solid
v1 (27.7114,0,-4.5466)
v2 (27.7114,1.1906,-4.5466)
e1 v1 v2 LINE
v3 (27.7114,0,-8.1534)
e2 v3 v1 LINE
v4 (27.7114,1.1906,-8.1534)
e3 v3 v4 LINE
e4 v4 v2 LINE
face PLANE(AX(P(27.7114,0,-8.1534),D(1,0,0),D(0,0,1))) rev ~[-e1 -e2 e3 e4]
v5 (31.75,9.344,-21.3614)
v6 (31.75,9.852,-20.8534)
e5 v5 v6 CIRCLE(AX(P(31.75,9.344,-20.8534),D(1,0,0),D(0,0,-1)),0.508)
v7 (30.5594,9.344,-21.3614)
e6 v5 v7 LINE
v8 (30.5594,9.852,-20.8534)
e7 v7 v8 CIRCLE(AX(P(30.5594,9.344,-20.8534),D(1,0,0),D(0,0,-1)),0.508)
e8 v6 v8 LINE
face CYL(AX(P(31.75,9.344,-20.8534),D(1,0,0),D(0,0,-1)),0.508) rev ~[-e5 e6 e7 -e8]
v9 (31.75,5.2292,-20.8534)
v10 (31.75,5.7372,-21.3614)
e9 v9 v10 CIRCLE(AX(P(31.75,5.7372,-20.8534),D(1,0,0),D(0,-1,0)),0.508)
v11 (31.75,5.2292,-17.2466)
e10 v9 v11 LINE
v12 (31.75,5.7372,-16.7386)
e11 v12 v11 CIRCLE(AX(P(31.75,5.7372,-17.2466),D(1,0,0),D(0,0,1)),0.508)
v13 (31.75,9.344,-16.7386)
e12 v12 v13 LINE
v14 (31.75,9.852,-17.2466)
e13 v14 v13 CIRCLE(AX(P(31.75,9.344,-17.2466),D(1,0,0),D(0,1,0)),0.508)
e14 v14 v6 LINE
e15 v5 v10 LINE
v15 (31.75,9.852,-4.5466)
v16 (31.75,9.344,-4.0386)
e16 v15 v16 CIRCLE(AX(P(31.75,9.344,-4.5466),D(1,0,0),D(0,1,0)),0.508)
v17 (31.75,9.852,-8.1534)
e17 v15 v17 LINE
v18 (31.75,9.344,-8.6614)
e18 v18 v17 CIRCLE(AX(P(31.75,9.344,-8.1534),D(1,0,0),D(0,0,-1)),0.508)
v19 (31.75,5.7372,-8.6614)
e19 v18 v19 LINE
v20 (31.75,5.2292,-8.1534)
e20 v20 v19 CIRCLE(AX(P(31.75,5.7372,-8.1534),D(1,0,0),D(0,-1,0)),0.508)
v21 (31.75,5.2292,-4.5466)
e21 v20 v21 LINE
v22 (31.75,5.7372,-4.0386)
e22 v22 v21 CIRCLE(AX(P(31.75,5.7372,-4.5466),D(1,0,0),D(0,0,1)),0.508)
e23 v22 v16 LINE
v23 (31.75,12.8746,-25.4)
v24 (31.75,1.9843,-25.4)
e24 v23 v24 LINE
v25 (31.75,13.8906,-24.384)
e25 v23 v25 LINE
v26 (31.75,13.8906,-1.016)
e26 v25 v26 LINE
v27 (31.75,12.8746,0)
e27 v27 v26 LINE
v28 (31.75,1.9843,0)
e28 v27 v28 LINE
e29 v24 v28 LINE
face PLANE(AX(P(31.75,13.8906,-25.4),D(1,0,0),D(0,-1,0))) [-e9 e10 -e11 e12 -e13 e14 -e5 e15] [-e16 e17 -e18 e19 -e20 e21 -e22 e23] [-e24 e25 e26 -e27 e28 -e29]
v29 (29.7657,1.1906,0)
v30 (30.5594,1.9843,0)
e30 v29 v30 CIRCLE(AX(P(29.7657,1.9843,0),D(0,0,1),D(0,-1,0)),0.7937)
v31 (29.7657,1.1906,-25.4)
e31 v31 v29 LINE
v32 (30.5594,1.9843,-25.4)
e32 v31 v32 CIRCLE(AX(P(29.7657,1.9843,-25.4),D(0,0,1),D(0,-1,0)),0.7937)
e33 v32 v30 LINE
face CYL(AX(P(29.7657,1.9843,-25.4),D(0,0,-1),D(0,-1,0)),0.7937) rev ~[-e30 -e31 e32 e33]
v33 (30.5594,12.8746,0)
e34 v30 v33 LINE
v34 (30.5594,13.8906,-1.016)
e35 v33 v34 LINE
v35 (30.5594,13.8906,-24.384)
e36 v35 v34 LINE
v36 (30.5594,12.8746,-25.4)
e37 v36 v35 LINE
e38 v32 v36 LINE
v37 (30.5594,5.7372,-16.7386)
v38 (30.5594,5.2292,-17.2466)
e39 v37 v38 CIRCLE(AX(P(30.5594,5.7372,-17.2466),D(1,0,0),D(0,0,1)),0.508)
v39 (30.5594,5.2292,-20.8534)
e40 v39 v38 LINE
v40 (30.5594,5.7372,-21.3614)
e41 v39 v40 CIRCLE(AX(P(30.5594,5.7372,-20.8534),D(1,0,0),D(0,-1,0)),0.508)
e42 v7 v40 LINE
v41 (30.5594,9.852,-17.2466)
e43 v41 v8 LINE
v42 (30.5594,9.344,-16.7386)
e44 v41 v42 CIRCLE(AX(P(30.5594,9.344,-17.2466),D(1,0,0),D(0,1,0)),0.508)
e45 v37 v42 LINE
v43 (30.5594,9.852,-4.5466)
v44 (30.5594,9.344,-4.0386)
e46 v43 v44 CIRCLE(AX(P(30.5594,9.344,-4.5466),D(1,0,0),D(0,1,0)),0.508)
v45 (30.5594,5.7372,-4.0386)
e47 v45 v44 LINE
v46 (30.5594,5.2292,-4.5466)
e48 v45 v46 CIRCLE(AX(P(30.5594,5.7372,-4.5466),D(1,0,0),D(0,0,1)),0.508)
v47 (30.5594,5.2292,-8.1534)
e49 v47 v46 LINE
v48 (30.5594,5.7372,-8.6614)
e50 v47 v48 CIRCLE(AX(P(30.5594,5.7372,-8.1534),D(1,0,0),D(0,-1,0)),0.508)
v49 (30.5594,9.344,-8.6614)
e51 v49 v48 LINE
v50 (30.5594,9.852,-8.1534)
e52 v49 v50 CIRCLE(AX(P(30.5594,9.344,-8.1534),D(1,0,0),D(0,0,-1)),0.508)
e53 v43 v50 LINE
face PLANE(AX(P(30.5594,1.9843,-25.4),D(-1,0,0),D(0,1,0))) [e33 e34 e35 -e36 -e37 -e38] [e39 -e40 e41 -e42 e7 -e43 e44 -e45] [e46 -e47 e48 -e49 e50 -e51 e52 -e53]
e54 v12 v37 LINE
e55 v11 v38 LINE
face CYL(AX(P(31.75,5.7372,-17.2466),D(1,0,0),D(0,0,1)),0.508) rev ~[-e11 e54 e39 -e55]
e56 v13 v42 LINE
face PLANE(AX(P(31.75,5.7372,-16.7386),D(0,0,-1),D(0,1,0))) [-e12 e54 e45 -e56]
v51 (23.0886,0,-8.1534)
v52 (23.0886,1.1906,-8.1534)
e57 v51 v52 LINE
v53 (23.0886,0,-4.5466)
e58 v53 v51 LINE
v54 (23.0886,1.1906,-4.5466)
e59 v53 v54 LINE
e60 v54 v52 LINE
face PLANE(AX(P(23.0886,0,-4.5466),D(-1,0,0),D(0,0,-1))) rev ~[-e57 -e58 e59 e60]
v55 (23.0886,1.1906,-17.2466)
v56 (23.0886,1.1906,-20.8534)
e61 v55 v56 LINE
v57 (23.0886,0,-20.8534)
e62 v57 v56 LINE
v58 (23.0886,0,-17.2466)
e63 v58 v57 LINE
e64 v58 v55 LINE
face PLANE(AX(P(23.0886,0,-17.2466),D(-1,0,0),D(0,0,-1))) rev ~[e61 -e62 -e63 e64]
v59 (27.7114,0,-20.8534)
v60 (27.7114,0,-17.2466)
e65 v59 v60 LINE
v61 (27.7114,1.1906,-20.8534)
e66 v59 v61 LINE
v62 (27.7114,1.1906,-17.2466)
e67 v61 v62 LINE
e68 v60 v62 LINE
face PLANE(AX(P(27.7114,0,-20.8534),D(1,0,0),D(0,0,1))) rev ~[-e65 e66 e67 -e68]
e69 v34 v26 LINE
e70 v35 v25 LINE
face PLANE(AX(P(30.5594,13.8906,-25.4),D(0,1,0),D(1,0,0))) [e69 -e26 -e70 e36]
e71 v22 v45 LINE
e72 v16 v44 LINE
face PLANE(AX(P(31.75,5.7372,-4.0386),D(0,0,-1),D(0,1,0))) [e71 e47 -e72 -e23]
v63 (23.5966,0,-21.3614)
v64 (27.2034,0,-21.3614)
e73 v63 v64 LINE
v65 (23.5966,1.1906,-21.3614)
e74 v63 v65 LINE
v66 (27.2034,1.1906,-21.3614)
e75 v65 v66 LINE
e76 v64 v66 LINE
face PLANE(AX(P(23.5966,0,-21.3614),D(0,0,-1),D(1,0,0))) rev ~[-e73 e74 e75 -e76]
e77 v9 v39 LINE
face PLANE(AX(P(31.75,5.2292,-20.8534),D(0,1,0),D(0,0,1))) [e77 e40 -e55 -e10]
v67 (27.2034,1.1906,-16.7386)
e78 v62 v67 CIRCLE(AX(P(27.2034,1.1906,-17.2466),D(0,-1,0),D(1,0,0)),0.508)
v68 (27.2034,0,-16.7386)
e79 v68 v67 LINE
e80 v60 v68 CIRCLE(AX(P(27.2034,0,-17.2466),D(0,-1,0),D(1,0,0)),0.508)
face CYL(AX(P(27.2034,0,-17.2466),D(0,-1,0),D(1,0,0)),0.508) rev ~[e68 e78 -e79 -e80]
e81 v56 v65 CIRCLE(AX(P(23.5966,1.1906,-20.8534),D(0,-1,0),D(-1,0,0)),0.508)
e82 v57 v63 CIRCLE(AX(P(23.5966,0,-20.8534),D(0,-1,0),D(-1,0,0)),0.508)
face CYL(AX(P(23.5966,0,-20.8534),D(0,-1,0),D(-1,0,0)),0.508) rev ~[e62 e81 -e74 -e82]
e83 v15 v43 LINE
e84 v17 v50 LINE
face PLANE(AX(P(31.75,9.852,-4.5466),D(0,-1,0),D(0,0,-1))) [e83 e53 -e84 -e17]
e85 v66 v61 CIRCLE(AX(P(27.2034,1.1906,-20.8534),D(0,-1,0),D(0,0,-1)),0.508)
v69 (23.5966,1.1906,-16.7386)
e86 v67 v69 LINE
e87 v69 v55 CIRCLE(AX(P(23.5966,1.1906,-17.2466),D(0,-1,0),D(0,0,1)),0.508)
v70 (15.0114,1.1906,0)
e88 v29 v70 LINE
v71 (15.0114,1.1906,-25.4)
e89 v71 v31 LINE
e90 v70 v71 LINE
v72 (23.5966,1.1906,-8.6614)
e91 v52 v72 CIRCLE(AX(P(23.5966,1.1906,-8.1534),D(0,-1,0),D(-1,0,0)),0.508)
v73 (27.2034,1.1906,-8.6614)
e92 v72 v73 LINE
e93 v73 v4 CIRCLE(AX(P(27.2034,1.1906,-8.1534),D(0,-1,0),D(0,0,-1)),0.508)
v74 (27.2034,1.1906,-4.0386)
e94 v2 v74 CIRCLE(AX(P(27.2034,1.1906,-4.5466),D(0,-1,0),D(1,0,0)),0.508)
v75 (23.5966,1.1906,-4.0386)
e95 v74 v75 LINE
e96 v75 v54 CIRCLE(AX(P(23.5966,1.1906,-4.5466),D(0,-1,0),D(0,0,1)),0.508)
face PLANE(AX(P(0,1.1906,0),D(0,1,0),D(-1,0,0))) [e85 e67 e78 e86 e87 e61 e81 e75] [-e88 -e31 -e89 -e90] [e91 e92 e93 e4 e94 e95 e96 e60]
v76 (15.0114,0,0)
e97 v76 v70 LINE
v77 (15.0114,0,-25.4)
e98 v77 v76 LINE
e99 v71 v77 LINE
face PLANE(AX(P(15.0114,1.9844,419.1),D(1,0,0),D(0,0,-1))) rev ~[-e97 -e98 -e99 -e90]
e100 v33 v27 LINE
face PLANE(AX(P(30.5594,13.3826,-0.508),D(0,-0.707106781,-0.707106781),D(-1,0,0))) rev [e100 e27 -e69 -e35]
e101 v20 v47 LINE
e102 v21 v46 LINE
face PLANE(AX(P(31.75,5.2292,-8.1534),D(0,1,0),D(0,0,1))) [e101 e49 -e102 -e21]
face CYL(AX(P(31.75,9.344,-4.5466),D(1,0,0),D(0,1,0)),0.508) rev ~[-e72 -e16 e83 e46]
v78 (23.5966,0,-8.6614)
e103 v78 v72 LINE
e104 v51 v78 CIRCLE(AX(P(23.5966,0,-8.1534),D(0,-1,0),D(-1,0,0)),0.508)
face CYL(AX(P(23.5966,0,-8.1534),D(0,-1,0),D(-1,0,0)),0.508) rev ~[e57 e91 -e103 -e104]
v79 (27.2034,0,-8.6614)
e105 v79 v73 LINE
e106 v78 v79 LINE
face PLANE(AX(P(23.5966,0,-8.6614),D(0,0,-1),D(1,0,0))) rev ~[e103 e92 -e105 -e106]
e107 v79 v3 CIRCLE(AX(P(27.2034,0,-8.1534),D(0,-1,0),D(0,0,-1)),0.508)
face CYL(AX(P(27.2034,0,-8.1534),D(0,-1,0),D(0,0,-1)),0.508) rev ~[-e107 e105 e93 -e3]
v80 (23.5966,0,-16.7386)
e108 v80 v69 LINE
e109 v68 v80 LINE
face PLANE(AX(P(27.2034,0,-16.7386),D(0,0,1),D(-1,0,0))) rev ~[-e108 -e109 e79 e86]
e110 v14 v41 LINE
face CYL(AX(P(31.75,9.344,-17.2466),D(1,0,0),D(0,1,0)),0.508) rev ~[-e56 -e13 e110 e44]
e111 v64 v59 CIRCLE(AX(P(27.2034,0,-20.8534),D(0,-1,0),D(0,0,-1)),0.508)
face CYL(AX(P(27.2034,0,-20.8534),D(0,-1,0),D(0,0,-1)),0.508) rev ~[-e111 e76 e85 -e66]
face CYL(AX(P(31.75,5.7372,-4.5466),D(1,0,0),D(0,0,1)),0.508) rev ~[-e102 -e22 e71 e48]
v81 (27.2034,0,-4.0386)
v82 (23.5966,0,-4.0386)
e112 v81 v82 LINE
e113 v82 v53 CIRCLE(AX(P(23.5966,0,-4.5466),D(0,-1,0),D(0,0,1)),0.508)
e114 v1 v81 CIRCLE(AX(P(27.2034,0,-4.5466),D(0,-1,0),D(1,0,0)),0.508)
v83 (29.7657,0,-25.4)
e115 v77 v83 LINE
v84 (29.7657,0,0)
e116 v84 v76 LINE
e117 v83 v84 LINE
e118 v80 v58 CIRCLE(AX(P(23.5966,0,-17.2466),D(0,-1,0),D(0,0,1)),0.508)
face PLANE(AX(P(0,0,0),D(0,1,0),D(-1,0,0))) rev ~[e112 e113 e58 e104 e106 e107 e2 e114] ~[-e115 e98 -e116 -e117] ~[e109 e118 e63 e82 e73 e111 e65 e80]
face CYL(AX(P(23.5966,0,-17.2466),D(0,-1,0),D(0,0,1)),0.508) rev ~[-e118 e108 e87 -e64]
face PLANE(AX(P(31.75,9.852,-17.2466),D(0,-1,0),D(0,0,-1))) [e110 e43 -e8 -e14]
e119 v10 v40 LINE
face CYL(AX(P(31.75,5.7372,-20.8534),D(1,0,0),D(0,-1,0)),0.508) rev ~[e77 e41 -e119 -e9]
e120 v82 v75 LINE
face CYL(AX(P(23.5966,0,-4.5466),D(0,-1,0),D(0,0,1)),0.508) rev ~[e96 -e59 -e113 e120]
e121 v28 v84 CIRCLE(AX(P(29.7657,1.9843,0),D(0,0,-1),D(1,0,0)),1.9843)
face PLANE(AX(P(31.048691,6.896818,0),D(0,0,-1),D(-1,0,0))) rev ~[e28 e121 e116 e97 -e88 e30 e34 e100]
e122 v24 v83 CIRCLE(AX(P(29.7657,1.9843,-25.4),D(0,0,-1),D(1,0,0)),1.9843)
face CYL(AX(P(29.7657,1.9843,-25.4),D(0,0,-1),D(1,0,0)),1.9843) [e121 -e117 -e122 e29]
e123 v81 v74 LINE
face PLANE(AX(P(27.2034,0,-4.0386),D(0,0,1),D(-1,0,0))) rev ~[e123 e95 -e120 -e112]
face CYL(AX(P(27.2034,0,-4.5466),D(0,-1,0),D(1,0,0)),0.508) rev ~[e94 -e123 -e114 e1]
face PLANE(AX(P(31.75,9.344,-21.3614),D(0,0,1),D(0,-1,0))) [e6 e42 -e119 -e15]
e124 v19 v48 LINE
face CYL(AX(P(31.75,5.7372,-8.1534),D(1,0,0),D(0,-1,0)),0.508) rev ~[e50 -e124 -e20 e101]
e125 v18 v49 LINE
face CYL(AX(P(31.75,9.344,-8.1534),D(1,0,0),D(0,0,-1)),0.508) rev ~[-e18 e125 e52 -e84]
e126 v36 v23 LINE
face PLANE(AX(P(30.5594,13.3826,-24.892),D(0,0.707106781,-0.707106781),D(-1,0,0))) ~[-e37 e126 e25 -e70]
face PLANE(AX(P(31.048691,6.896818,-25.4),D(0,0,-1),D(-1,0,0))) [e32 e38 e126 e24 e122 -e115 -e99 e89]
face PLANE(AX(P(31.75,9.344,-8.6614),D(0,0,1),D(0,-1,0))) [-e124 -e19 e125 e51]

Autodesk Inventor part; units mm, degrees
ref_plane "YZ Plane" through (0, 0, 0) normal (1, 0, 0) x (0, 1, 0)
ref_plane "XZ Plane" through (0, 0, 0) normal (0, 1, 0) x (-1, 0, 0)
sketch "Sketch1" plane through (0, 0, 0) normal (0, 1, 0) x (-1, 0, 0)
  line L0 (-31.75, 0) -> (31.75, 0)
  line L1 (31.75, 0) -> (31.75, -25.4)
  line L2 (31.75, -25.4) -> (-31.75, -25.4)
  line L3 (-31.75, -25.4) -> (-31.75, 0)
  line L4 (31.75, 0) -> (-31.75, -25.4) construction
  point P0 (0, 0)
  point P1 (0, 0)
  dimension "d0" = 63.5
  dimension "d1" = 25.4
extrude "Plate1" add sketch "Sketch1" along normal blind 1.1906
sketch "Sketch2" plane through (30.5594, 0, -25.4) normal (1, 0, 0) x (0, 1, 0)
  line L0 (0, 25.4) -> (0, 0)
  line L1 (0, 0) -> (13.8906, 0)
  line L2 (13.8906, 0) -> (13.8906, 25.4)
  line L3 (13.8906, 25.4) -> (0, 25.4)
edge flange "Flanges" height 12.7 angle 90 thickness 1.1906 bend radius 0.7937 thickness toward (1, 0, 0) relief tear relief width 1.1906 relief depth 0.5953 corner gap 1.1906 corner form 0 edges at (31.75, 1.1906, -12.7) (-31.75, 1.1906, -12.7) wall of the first edge with corners at (30.5594, 0, 0) (30.5594, 0, -25.4) (30.5594, 13.8906, -25.4) (30.5594, 13.8906, 0)
bend "Bend1"
corner "Corner1"
sketch "Sketch3" plane through (31.75, 1.9844, -25.4) normal (1, 0, 0) x (0, 0, -1)
  line L0 (-20.8534, 7.8676) -> (-17.2466, 7.8676)
  line L1 (-16.7386, 7.3596) -> (-16.7386, 3.7528)
  line L2 (-17.2466, 3.2448) -> (-20.8534, 3.2448)
  line L3 (-21.3614, 3.7528) -> (-21.3614, 7.3596)
  arc A0 (-20.8534, 7.8676) -> (-21.3614, 7.3596) centre (-20.8534, 7.3596) ccw
  arc A1 (-16.7386, 7.3596) -> (-17.2466, 7.8676) centre (-17.2466, 7.3596) ccw
  arc A2 (-17.2466, 3.2448) -> (-16.7386, 3.7528) centre (-17.2466, 3.7528) ccw
  arc A3 (-21.3614, 3.7528) -> (-20.8534, 3.2448) centre (-20.8534, 3.7528) ccw
  line L4 (-25.4, 0) -> (-25.4, 11.9062) construction
  line L5 (-25.4, 11.9062) -> (0, 11.9063) construction
  line L6 (-20.8534, 7.3596) -> (-17.2466, 3.7528) construction
  point P0 (-25.4, -1.9844)
  point P1 (-16.7386, 3.2448)
  point P2 (-21.3614, 3.2448)
  point P3 (-19.05, 5.5562)
  dimension "d16" = 4.6228
  dimension "d17" = 0.508
  dimension "d20" = 6.35
  dimension "d21" = 6.35
extrude "Flange Stamp" cut sketch "Sketch3" against normal blind 1.1906
sketch "Sketch7" plane through (31.75, 1.9844, 0) normal (1, 0, 0) x (0, 0, -1)
  arc A0 (4.5466, 7.8676) -> (4.0386, 7.3596) centre (4.5466, 7.3596) ccw construction
  arc A1 (8.1534, 3.2448) -> (8.6614, 3.7528) centre (8.1534, 3.7528) ccw construction
  circle A2 centre (6.35, 5.5563) radius 2.1844
  line L0 (4.5466, 7.3596) -> (8.1534, 3.7528) construction
  point P0 (0, -1.9844)
  dimension "d46" = 4.3688
surface extrude "Flange Circle" sketch "Sketch7" against normal up to surface (1.1906 mm away) shown yes curves A2
ref_plane "Flange Pattern Plane" through (31.75, 7.5406, -4.5466) normal (0, 1, 0) x (1, 0, 0)
sketch "Flange Pattern Sketch" plane through (31.75, 7.5406, -4.5466) normal (0, 1, 0) x (1, 0, 0)
  line L0 (0, 3.6068) -> (0, 0) construction
  line L1 (-76.2822, -4.5466) -> (13.1932, -4.5466) construction
  line L2 (0, 0) -> (-1.1906, 0) construction
  point P0 (-31.75, -4.5466)
  point P1 (0, 1.8034)
  point P2 (0, 14.5034)
  dimension "d131" = 12.7
  dimension "d134" = 12.7
pattern_sketch "Flange Pattern" of "Flange Circle", "Flange Stamp" from (31.75, 7.5406, -6.35) copies at (31.75, 7.5406, -19.05)
sketch "Sketch8" plane through (0, 0, 0) normal (0, -1, 0) x (1, 0, 0)
  line L0 (29.7656, 0) -> (-29.7656, 0) construction
  line L1 (27.2034, -4.0386) -> (23.5966, -4.0386)
  line L2 (23.0886, -4.5466) -> (23.0886, -8.1534)
  line L3 (23.5966, -8.6614) -> (27.2034, -8.6614)
  line L4 (27.7114, -8.1534) -> (27.7114, -4.5466)
  arc A0 (27.7114, -4.5466) -> (27.2034, -4.0386) centre (27.2034, -4.5466) ccw
  arc A1 (27.2034, -8.6614) -> (27.7114, -8.1534) centre (27.2034, -8.1534) ccw
  arc A2 (23.0886, -8.1534) -> (23.5966, -8.6614) centre (23.5966, -8.1534) ccw
  arc A3 (23.5966, -4.0386) -> (23.0886, -4.5466) centre (23.5966, -4.5466) ccw
  line L5 (27.2034, -4.5466) -> (23.5966, -8.1534) construction
  line L6 (31.75, 0) -> (31.75, -25.4) construction
  point P0 (0, 0)
  point P1 (23.0886, -8.6614)
  point P2 (27.7114, -8.6614)
  point P3 (25.4, -6.35)
  dimension "d49" = 4.6228
  dimension "d50" = 0.508
  dimension "d51" = 6.35
  dimension "d52" = 6.35
extrude "Body Stamp" cut sketch "Sketch8" against normal blind 1.1906
sketch "Sketch9" plane through (0, 0, 0) normal (0, -1, 0) x (1, 0, 0)
  arc A0 (27.7114, -4.5466) -> (27.2034, -4.0386) centre (27.2034, -4.5466) ccw construction
  arc A1 (23.0886, -8.1534) -> (23.5966, -8.6614) centre (23.5966, -8.1534) ccw construction
  line L0 (27.2034, -4.5466) -> (23.5966, -8.1534) construction
  circle A2 centre (25.4, -6.35) radius 2.1844
  point P0 (0, 0)
  dimension "d55" = 4.3688
surface extrude "Body Circle" sketch "Sketch9" against normal up to surface (1.1906 mm away) shown yes curves A2
sketch "Body Pattern Sketch" plane through (0, 0, 0) normal (0, -1, 0) x (1, 0, 0)
  line L0 (29.7656, 0) -> (-29.7656, 0) construction
  line L1 (31.75, 0) -> (31.75, -25.4) construction
  circle A0 centre (25.4, -6.35) radius 2.1844 construction
  point P0 (0, 0)
  point P1 (25.4, -19.05)
  dimension "d62" = 12.7
  dimension "d65" = 12.7
  dimension "d139" = 12.7
pattern_sketch "Body Pattern" of "Body Stamp", "Body Circle" from (25.4, 0, -6.35) copies at (25.4, 0, -19.05)
sketch "Arc Length" plane through (30.5594, 1.9844, 0) normal (0, 0, 1) x (1, 0, 0)
  line L0 (0, 0) -> (1.1906, 0) construction
  arc A0 (-0.7938, -0.7938) -> (0, 0) centre (-0.7938, 0) ccw construction
  line L1 (-0.7938, -1.9844) -> (-0.7938, -0.7938) construction
  arc A1 (-0.7938, -1.9844) -> (1.1906, 0) centre (-0.7938, 0) ccw construction
  point P0 (-30.5594, -1.9844)
  dimension "d85" = 3.117
  dimension "d92" = 1.2468
sketch "Sketch13" plane through (31.75, 13.8906, 0) normal (1, 0, 0) x (0, 0, -1)
  line L0 (0, 0) -> (25.4, 0) construction
  line L1 (62.4078, 0) -> (63.4238, -1.016)
  line L2 (63.4238, -1.016) -> (64.4398, 0)
  line L3 (62.4078, 0) -> (64.4398, 0)
  line L4 (25.4, -11.9063) -> (0, -11.9063) construction
  line L5 (63.4238, -10.8903) -> (61.3168, -12.9972)
  line L6 (61.3168, -12.9972) -> (63.4238, -15.1042)
  line L7 (63.4238, -15.1042) -> (65.5308, -12.9972)
  line L8 (65.5308, -12.9972) -> (63.4238, -10.8903)
  line L9 (63.4238, -10.8903) -> (63.4238, -15.1042) construction
  line L10 (63.4238, -1.016) -> (63.4238, -10.8903) construction
  line L11 (0, -11.9063) -> (25.4, -11.9063) construction
  point P0 (0, -13.8906)
  dimension "d86" = 4.2139
  dimension "d88" = 1.016
  dimension "d91" = 1.016
  dimension "d102" = 63.4238
feature "Notch" [suppressed]
mirror "Notch Mirror" [suppressed]
pattern_linear "Notch Pattern" [suppressed]
chamfer "End Chamfer" distance 1.016 angle 45 4 edges at (-31.1547, 13.8906, -25.4) (31.1547, 13.8906, -25.4) (-31.1547, 13.8906, 0) (31.1547, 13.8906, 0)
sketch "Sketch14" plane through (-31.75, 1.9844, 419.1) normal (1, 0, 0) x (0, 0, -1)
  line L0 (419.1, 11.9063) -> (444.5, 11.9063) construction
  line L1 (419.1, 0) -> (419.1, 11.9063) construction
  line L2 (419.1, -1.9844) -> (444.5, -1.9844) construction
  line L3 (419.1, 11.9063) -> (444.5, 11.9063)
  line L4 (444.5, 11.9063) -> (444.5, -1.9844)
  line L5 (444.5, -1.9844) -> (419.1, -1.9844)
  line L6 (419.1, -1.9844) -> (419.1, 11.9063)
  point P0 (382.0521, -1.9844)
extrude "Half Cut" cut sketch "Sketch14" along normal blind 46.7614
equation "\"d1\" = 12.7 * Length"
equation "\"d18\" = Thickness"
equation "\"d53\" = Thickness"
equation "\"d89\" = Thickness"
equation "\"d2\" = Thickness"
equation "\"d3\" = BendReliefWidth"
equation "\"d4\" = BendReliefDepth"
equation "\"d5\" = MinimumRemnant"
equation "\"d6\" = TransitionRadius"
equation "\"d10\" = CornerReliefSize"
equation "\"d11\" = GapSize"
equation "\"d12\" = JacobiRadiusSize"
equation "\"BendRadius\" = Thickness"
equation "\"BendReliefWidth\" = Thickness"
equation "\"BendReliefDepth\" = 0.5 * Thickness"
equation "\"CornerReliefSize\" = 4 * Thickness"
equation "\"MinimumRemnant\" = 2 * Thickness"
equation "\"TransitionRadius\" = BendRadius"
equation "\"JacobiRadiusSize\" = BendRadius"
equation "\"GapSize\" = Thickness"
equation "\"Length\" = 2"
equation "\"Thickness\" = 1.190625"
properties part number "Alu C 1x3x1x35"
